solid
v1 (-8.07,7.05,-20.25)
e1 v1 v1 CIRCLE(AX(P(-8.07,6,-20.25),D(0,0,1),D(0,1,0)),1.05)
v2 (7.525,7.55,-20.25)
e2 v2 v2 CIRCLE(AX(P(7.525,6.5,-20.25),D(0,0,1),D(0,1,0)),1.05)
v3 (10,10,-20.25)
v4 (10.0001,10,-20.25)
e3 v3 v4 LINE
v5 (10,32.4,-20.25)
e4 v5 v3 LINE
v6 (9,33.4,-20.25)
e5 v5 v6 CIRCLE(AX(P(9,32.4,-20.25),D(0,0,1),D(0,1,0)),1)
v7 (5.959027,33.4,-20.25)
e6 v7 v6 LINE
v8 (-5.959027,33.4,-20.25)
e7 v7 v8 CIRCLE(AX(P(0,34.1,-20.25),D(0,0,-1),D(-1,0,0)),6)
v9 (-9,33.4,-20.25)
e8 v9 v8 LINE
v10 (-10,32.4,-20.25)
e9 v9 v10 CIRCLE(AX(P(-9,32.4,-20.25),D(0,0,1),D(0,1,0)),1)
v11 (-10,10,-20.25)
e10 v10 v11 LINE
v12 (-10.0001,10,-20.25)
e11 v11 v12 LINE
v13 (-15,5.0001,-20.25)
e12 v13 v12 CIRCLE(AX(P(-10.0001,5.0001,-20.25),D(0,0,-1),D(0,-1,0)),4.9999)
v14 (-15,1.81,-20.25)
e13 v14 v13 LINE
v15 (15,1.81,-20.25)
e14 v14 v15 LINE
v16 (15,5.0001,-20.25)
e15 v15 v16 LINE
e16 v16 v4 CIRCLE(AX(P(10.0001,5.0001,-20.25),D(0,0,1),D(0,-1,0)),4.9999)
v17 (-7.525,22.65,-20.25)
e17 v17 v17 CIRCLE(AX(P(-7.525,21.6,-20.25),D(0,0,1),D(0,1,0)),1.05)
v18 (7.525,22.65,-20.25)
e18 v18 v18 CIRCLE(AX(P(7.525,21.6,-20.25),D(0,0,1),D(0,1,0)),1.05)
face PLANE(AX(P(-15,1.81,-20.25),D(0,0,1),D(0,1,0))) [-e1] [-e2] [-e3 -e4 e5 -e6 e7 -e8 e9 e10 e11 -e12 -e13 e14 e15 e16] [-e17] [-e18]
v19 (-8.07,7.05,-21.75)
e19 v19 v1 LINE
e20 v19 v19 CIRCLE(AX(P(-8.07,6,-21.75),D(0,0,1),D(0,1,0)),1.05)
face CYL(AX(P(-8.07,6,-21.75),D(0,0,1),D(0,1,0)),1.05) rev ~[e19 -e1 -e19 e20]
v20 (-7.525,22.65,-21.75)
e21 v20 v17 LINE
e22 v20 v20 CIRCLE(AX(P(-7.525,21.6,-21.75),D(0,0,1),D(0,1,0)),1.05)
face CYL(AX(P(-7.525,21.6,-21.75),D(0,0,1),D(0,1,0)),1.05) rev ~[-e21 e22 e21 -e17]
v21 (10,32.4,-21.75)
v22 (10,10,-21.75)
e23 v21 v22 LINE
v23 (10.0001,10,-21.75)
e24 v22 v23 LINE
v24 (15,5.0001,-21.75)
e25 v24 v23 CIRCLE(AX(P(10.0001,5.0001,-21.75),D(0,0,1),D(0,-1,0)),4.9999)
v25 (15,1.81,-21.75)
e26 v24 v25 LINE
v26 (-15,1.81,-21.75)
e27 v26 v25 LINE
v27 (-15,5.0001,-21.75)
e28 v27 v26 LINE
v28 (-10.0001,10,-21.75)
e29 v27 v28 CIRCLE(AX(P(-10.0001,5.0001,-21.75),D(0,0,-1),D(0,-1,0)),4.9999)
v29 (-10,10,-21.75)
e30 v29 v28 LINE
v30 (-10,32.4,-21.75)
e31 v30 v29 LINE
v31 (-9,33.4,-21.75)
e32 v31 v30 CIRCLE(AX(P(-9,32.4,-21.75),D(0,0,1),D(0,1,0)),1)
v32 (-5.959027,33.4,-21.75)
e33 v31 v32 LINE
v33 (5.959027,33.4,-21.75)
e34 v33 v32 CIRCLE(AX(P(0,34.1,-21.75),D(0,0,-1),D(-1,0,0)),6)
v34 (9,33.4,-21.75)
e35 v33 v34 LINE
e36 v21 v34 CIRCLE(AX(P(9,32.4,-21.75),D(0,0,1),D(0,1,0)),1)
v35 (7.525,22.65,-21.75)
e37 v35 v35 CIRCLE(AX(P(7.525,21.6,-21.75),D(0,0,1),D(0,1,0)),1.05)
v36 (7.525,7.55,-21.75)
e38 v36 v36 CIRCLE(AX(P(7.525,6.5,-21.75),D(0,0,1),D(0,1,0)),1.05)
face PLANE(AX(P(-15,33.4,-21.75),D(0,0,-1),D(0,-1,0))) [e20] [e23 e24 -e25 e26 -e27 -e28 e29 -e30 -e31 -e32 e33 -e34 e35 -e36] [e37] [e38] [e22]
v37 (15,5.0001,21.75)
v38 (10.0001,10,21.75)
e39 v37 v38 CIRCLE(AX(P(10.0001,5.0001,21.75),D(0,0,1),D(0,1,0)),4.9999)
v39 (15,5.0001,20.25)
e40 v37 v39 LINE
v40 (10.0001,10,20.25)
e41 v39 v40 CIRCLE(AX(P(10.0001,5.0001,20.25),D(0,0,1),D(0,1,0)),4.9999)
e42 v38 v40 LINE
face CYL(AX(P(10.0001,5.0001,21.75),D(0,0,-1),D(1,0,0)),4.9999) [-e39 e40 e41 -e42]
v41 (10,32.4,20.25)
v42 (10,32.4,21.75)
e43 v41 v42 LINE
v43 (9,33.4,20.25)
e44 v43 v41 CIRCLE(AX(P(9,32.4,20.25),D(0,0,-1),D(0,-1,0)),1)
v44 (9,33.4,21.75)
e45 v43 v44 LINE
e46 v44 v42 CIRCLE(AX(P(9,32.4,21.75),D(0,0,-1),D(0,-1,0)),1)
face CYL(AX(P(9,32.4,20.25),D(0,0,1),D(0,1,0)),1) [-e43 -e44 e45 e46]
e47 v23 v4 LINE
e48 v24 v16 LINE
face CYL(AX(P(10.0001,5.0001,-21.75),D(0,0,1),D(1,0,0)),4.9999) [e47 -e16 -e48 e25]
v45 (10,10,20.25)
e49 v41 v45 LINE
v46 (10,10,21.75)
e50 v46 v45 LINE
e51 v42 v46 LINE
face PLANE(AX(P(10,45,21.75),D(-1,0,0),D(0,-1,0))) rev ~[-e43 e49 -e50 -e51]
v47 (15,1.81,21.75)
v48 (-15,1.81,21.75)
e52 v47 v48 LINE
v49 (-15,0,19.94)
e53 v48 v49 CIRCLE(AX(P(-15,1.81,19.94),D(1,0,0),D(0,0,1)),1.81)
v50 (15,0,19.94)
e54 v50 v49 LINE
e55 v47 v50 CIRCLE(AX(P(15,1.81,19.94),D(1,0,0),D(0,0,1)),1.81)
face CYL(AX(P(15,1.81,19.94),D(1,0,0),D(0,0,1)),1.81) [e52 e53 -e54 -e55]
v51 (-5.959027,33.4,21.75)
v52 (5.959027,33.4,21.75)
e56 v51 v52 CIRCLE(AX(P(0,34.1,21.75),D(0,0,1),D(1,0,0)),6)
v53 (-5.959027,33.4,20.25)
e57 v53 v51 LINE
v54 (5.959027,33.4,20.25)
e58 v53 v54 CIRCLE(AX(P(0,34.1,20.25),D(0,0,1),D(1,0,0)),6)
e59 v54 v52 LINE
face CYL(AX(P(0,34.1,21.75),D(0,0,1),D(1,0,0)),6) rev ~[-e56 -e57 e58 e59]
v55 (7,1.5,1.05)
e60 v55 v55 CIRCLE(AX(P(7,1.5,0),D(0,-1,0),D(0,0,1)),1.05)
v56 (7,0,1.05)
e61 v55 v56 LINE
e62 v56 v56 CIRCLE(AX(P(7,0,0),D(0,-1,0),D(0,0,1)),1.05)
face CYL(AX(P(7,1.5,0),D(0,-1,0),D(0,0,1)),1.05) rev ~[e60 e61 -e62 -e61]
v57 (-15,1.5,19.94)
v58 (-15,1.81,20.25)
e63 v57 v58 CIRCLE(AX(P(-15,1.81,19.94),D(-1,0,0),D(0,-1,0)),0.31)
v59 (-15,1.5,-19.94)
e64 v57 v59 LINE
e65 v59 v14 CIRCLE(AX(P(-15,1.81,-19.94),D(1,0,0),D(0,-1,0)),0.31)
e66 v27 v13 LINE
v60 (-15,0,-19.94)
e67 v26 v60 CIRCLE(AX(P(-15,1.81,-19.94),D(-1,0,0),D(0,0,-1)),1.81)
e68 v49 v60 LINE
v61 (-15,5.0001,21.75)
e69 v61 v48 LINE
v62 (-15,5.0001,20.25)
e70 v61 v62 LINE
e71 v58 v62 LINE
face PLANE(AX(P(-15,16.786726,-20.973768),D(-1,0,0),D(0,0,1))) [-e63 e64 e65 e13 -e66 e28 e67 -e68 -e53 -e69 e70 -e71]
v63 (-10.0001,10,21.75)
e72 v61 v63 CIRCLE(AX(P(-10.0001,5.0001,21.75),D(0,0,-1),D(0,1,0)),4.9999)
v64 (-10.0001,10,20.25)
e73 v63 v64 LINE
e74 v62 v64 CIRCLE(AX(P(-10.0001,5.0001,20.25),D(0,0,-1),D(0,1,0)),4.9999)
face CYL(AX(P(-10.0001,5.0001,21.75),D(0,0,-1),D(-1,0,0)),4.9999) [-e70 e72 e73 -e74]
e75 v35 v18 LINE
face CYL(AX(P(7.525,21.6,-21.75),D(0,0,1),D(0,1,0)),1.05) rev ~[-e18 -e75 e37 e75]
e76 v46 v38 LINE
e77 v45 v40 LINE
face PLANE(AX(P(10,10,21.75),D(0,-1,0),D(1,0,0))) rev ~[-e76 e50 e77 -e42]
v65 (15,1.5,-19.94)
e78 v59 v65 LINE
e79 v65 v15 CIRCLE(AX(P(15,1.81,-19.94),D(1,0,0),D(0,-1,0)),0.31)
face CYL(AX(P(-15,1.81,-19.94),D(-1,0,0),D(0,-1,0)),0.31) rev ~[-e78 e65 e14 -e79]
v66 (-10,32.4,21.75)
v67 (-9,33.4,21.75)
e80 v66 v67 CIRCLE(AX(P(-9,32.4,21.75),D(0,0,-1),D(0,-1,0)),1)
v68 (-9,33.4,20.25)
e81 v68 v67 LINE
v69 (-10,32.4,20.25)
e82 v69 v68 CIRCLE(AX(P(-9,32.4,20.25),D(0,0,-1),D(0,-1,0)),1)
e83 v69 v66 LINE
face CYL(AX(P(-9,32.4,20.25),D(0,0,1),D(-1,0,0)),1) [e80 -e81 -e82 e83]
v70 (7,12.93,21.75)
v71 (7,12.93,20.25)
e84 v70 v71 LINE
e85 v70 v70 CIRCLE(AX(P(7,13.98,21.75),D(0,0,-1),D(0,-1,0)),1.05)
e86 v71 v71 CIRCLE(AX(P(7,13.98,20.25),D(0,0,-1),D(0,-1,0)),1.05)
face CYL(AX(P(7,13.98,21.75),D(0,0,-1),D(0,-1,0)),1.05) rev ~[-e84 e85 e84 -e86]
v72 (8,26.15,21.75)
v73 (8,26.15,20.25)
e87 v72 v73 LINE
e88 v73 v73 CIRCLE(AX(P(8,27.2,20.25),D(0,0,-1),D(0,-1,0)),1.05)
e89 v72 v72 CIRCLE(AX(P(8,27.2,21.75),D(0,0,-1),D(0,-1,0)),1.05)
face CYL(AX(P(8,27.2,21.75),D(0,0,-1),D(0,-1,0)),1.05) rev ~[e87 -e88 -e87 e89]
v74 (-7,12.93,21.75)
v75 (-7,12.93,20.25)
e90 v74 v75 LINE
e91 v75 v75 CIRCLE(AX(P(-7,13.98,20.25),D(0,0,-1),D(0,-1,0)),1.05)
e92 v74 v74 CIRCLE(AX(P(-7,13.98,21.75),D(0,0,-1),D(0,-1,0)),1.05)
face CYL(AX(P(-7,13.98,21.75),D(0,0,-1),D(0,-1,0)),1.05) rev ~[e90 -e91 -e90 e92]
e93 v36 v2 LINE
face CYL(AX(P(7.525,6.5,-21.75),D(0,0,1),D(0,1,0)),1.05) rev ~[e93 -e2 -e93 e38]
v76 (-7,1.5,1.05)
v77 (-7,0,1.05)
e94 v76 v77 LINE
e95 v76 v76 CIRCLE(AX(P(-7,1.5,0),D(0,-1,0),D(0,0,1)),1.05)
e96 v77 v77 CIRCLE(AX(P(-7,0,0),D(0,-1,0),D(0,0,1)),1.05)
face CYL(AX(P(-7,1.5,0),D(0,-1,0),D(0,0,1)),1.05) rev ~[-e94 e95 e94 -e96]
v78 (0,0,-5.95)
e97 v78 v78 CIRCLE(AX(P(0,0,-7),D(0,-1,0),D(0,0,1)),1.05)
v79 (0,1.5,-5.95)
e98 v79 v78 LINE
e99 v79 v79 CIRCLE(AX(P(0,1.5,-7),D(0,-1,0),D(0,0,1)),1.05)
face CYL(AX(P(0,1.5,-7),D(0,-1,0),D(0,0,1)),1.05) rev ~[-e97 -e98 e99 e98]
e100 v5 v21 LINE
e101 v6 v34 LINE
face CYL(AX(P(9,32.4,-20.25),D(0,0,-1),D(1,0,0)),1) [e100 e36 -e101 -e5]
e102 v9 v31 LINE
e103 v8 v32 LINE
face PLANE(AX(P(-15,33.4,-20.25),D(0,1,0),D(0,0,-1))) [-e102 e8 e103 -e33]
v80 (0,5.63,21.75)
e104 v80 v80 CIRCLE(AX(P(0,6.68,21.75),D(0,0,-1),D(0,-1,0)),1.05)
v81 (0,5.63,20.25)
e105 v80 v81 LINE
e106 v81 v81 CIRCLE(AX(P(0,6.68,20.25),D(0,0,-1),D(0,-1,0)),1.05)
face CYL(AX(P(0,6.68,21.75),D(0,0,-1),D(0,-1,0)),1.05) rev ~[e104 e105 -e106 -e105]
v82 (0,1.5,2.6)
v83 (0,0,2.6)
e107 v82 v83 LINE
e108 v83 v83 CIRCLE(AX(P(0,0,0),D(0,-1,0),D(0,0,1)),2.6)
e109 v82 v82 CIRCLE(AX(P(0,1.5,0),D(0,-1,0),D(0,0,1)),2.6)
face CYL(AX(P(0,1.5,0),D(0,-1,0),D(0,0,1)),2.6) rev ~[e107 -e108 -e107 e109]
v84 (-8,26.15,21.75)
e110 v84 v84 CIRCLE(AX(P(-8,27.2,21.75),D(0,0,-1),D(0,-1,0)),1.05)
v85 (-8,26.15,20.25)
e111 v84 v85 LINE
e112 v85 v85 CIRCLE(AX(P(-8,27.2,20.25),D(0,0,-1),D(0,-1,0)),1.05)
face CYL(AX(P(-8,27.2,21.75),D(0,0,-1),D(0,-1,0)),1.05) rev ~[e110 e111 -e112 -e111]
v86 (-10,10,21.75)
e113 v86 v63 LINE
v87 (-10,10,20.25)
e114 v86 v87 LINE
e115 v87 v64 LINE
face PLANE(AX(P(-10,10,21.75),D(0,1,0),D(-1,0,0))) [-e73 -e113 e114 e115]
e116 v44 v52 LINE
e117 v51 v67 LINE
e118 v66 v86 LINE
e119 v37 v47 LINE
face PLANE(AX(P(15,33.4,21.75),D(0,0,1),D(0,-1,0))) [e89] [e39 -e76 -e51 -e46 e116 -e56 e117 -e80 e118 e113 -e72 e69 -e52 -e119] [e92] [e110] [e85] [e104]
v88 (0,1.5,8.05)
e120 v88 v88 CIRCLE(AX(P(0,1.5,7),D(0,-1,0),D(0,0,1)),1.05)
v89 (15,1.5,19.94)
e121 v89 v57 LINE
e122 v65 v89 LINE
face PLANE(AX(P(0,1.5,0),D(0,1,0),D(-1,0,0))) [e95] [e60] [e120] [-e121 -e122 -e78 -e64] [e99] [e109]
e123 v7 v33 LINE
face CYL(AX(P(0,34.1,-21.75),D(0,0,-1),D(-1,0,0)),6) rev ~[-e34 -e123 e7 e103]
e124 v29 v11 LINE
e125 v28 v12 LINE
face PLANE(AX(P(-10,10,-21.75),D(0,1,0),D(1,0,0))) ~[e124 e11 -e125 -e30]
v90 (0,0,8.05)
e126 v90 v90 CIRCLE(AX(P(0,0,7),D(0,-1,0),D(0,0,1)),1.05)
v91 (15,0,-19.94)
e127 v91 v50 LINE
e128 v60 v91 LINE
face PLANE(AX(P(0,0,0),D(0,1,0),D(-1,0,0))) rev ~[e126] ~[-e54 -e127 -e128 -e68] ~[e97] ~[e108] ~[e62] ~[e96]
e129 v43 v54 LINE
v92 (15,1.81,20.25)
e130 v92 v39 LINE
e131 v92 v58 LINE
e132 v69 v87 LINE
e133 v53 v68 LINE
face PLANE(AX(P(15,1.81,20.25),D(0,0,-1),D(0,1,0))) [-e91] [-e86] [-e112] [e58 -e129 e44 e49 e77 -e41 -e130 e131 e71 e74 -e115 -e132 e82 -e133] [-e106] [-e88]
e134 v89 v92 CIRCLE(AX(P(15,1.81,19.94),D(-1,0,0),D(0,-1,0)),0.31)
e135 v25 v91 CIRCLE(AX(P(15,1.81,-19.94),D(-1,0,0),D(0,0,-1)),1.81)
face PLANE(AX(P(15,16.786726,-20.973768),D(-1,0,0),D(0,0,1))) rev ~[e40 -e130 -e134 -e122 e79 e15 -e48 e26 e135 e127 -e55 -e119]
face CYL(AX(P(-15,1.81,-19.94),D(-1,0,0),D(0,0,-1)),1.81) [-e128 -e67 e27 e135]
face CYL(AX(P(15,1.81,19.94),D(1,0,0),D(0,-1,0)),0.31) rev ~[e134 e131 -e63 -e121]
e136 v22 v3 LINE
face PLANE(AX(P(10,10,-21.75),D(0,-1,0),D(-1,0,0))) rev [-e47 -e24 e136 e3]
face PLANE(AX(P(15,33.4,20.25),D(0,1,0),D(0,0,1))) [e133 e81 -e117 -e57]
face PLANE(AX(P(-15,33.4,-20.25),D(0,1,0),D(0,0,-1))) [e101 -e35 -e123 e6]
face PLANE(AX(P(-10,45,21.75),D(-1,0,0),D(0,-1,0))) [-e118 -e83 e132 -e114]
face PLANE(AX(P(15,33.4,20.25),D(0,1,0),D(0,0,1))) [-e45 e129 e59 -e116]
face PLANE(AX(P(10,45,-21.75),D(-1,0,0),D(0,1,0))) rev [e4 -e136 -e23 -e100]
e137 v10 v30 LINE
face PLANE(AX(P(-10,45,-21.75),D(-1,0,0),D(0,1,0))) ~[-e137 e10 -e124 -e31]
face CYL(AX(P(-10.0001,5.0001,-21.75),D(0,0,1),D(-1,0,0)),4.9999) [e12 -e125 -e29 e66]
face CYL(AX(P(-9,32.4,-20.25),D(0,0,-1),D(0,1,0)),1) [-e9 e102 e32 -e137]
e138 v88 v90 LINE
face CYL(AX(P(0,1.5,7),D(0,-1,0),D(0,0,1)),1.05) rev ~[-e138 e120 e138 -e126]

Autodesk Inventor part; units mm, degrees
ref_plane "YZ Plane" through (0, 0, 0) normal (1, 0, 0) x (0, 1, 0)
ref_plane "XZ Plane" through (0, 0, 0) normal (0, 1, 0) x (-1, 0, 0)
ref_plane "XY Plane" through (0, 0, 0) normal (0, 0, 1) x (1, 0, 0)
sketch "Sketch1" plane through (0, 0, 0) normal (0, 1, 0) x (-1, 0, 0)
  line L0 (-15, 20.25) -> (15, 20.25)
  line L1 (15, 20.25) -> (15, -20.25)
  line L2 (15, -20.25) -> (-15, -20.25)
  line L3 (-15, -20.25) -> (-15, 20.25)
  line L4 (-15, 20.25) -> (15, -20.25) construction
  line L5 (15, 20.25) -> (-15, -20.25) construction
  point P0 (0, 0)
  dimension "d0" = 40.5
  dimension "d1" = 30
extrude "Plate1" add sketch "Sketch1" along normal blind 1.5
sketch "Sketch2" plane through (-15, 0, -21.75) normal (0, 0, 1) x (1, 0, 0)
  line L0 (30, 0) -> (0, 0)
  line L1 (0, 0) -> (0, 33.4)
  line L2 (0, 33.4) -> (30, 33.4)
  line L3 (30, 33.4) -> (30, 0)
edge flange "Flange1" height 33.4 angle 90 thickness 1.5 bend radius 0.31 thickness toward (0, 0, 1) relief tear relief width 1.5 relief depth 0.75 corner gap 0.31 corner form 0 edges at (0, 1.5, -20.25) (0, 1.5, 20.25) wall of the first edge with corners at (15, 0, -21.75) (-15, 0, -21.75) (-15, 33.4, -21.75) (15, 33.4, -21.75)
bend "Bend1"
corner "Corner1"
sketch "Sketch3" plane through (0, 1.5, 0) normal (0, 1, 0) x (1, 0, 0)
  circle A0 centre (7, 0) radius 0.7835 projected
  circle A1 centre (0, -7) radius 0.7835 projected
  circle A2 centre (-7, 0) radius 0.7835 projected
  circle A3 centre (0, 7) radius 0.7835 projected
  point P0 (0, 0)
hole "Hole1" at (0, 1.5, 7) at (7, 1.5, 0) at (-7, 1.5, 0) at (0, 1.5, -7) direction (0, -1, 0) diameter 2.1 depth 1.5
sketch "Sketch26" plane through (-15, 33.4, 21.75) normal (0, 0, 1) x (1, 0, 0)
  line L0 (30, 11.6) -> (25, 11.6)
  line L1 (25, 11.6) -> (25, -23.4)
  line L2 (25, -23.4) -> (30, -23.4)
  line L3 (30, -23.4) -> (30, 11.6)
  line L4 (0, 11.6) -> (5, 11.6)
  line L5 (5, 11.6) -> (5, -23.4)
  line L6 (5, -23.4) -> (0, -23.4)
  line L7 (0, -23.4) -> (0, 11.6)
  point P0 (15, -33.4)
  dimension "d91" = 35
  dimension "d92" = 5
  dimension "d93" = 10
  dimension "d94" = 10
  dimension "d95" = 5
  dimension "d96" = 35
  dimension "d97" = 10
  dimension "d98" = 10
extrude "Cut11" cut sketch "Sketch26" against normal blind 1.5
fillet "Corner Round1" radius 5 1 edges at (-15, 10, 21)
fillet "Corner Round2" radius 5 1 edges at (15, 10, 21)
mirror "Mirror1" about plane through (0, 0, 0) normal (0, 0, 1) of "Cut11"
fillet "Corner Round3" radius 5 1 edges at (-15, 10, -21)
fillet "Corner Round4" radius 5 1 edges at (15, 10, -21)
sketch "Sketch27" plane through (-15, 1.81, 21.75) normal (0, 0, 1) x (1, 0, 0)
  circle A0 centre (15, 32.29) radius 6
  point P0 (15, -1.81)
extrude "Cut12" cut sketch "Sketch27" against normal blind 1.5
sketch "Sketch28" plane through (15, 1.81, -21.75) normal (0, 0, -1) x (-1, 0, 0)
  circle A0 centre (15, 32.29) radius 6
  point P0 (15, -1.81)
extrude "Cut13" cut sketch "Sketch28" against normal blind 1.5
fillet "Corner Round5" radius 1 4 edges at (10, 33.4, -21) (10, 33.4, 21) (-10, 33.4, 21) (-10, 33.4, -21)
sketch "Sketch31" plane through (-15, 1.81, 21.75) normal (0, 0, 1) x (1, 0, 0)
  point P0 (15, -1.81)
sketch "Sketch32" plane through (-15, 1.81, 21.75) normal (0, 0, 1) x (1, 0, 0)
  circle A0 centre (23, 25.39) radius 0.7835
  circle A1 centre (22, 12.17) radius 0.7835
  circle A2 centre (7, 25.39) radius 0.7835
  circle A3 centre (8, 12.17) radius 0.7835
  circle A4 centre (15, 4.87) radius 0.7835
  point P0 (15, -1.81)
hole "Hole11" at (8, 27.2, 21.75) at (7, 13.98, 21.75) at (-8, 27.2, 21.75) at (-7, 13.98, 21.75) at (0, 6.68, 21.75) direction (0, 0, -1) diameter 2.1 depth 1.5
sketch "Sketch33" plane through (15, 1.81, -21.75) normal (0, 0, -1) x (-1, 0, 0)
  circle A0 centre (23.07, 4.19) radius 0.7835
  circle A1 centre (7.475, 4.69) radius 0.7835
  circle A2 centre (7.475, 19.79) radius 0.7835
  circle A3 centre (22.525, 19.79) radius 0.7835
  point P0 (15, -1.81)
hole "Hole12" at (7.525, 6.5, -21.75) at (-8.07, 6, -21.75) at (7.525, 21.6, -21.75) at (-7.525, 21.6, -21.75) direction (0, 0, 1) diameter 2.1 depth 1.5
sketch "Sketch34" plane through (0, 1.5, 0) normal (0, 1, 0) x (1, 0, 0)
  circle A0 centre (0, 0) radius 1.2295
  point P0 (0, 0)
hole "Hole13" at (0, 1.5, 0) direction (0, -1, 0) diameter 5.2 depth 1.5
equation "\"d18\" = Thickness"
equation "\"d99\" = Thickness"
equation "\"d105\" = Thickness"
equation "\"d107\" = Thickness"
equation "\"d129\" = Thickness"
equation "\"d136\" = Thickness"
equation "\"d143\" = Thickness"
equation "\"d2\" = Thickness"
equation "\"d3\" = BendReliefWidth"
equation "\"d4\" = BendReliefDepth"
equation "\"d5\" = MinimumRemnant"
equation "\"d6\" = TransitionRadius"
equation "\"d9\" = BendRadius"
equation "\"d10\" = CornerReliefSize"
equation "\"d11\" = GapSize"
equation "\"d12\" = JacobiRadiusSize"
equation "\"BendReliefWidth\" = Thickness"
equation "\"BendReliefDepth\" = 0.5 * Thickness"
equation "\"CornerReliefSize\" = 4 * Thickness"
equation "\"MinimumRemnant\" = 2 * Thickness"
equation "\"TransitionRadius\" = BendRadius"
equation "\"JacobiRadiusSize\" = BendRadius"
equation "\"GapSize\" = Thickness"
equation "\"Thickness\" = 1.5"
equation "\"BendRadius\" = 0.31"
properties part number "axis_19_top_frame" material "Aluminum 6061-AHC"
